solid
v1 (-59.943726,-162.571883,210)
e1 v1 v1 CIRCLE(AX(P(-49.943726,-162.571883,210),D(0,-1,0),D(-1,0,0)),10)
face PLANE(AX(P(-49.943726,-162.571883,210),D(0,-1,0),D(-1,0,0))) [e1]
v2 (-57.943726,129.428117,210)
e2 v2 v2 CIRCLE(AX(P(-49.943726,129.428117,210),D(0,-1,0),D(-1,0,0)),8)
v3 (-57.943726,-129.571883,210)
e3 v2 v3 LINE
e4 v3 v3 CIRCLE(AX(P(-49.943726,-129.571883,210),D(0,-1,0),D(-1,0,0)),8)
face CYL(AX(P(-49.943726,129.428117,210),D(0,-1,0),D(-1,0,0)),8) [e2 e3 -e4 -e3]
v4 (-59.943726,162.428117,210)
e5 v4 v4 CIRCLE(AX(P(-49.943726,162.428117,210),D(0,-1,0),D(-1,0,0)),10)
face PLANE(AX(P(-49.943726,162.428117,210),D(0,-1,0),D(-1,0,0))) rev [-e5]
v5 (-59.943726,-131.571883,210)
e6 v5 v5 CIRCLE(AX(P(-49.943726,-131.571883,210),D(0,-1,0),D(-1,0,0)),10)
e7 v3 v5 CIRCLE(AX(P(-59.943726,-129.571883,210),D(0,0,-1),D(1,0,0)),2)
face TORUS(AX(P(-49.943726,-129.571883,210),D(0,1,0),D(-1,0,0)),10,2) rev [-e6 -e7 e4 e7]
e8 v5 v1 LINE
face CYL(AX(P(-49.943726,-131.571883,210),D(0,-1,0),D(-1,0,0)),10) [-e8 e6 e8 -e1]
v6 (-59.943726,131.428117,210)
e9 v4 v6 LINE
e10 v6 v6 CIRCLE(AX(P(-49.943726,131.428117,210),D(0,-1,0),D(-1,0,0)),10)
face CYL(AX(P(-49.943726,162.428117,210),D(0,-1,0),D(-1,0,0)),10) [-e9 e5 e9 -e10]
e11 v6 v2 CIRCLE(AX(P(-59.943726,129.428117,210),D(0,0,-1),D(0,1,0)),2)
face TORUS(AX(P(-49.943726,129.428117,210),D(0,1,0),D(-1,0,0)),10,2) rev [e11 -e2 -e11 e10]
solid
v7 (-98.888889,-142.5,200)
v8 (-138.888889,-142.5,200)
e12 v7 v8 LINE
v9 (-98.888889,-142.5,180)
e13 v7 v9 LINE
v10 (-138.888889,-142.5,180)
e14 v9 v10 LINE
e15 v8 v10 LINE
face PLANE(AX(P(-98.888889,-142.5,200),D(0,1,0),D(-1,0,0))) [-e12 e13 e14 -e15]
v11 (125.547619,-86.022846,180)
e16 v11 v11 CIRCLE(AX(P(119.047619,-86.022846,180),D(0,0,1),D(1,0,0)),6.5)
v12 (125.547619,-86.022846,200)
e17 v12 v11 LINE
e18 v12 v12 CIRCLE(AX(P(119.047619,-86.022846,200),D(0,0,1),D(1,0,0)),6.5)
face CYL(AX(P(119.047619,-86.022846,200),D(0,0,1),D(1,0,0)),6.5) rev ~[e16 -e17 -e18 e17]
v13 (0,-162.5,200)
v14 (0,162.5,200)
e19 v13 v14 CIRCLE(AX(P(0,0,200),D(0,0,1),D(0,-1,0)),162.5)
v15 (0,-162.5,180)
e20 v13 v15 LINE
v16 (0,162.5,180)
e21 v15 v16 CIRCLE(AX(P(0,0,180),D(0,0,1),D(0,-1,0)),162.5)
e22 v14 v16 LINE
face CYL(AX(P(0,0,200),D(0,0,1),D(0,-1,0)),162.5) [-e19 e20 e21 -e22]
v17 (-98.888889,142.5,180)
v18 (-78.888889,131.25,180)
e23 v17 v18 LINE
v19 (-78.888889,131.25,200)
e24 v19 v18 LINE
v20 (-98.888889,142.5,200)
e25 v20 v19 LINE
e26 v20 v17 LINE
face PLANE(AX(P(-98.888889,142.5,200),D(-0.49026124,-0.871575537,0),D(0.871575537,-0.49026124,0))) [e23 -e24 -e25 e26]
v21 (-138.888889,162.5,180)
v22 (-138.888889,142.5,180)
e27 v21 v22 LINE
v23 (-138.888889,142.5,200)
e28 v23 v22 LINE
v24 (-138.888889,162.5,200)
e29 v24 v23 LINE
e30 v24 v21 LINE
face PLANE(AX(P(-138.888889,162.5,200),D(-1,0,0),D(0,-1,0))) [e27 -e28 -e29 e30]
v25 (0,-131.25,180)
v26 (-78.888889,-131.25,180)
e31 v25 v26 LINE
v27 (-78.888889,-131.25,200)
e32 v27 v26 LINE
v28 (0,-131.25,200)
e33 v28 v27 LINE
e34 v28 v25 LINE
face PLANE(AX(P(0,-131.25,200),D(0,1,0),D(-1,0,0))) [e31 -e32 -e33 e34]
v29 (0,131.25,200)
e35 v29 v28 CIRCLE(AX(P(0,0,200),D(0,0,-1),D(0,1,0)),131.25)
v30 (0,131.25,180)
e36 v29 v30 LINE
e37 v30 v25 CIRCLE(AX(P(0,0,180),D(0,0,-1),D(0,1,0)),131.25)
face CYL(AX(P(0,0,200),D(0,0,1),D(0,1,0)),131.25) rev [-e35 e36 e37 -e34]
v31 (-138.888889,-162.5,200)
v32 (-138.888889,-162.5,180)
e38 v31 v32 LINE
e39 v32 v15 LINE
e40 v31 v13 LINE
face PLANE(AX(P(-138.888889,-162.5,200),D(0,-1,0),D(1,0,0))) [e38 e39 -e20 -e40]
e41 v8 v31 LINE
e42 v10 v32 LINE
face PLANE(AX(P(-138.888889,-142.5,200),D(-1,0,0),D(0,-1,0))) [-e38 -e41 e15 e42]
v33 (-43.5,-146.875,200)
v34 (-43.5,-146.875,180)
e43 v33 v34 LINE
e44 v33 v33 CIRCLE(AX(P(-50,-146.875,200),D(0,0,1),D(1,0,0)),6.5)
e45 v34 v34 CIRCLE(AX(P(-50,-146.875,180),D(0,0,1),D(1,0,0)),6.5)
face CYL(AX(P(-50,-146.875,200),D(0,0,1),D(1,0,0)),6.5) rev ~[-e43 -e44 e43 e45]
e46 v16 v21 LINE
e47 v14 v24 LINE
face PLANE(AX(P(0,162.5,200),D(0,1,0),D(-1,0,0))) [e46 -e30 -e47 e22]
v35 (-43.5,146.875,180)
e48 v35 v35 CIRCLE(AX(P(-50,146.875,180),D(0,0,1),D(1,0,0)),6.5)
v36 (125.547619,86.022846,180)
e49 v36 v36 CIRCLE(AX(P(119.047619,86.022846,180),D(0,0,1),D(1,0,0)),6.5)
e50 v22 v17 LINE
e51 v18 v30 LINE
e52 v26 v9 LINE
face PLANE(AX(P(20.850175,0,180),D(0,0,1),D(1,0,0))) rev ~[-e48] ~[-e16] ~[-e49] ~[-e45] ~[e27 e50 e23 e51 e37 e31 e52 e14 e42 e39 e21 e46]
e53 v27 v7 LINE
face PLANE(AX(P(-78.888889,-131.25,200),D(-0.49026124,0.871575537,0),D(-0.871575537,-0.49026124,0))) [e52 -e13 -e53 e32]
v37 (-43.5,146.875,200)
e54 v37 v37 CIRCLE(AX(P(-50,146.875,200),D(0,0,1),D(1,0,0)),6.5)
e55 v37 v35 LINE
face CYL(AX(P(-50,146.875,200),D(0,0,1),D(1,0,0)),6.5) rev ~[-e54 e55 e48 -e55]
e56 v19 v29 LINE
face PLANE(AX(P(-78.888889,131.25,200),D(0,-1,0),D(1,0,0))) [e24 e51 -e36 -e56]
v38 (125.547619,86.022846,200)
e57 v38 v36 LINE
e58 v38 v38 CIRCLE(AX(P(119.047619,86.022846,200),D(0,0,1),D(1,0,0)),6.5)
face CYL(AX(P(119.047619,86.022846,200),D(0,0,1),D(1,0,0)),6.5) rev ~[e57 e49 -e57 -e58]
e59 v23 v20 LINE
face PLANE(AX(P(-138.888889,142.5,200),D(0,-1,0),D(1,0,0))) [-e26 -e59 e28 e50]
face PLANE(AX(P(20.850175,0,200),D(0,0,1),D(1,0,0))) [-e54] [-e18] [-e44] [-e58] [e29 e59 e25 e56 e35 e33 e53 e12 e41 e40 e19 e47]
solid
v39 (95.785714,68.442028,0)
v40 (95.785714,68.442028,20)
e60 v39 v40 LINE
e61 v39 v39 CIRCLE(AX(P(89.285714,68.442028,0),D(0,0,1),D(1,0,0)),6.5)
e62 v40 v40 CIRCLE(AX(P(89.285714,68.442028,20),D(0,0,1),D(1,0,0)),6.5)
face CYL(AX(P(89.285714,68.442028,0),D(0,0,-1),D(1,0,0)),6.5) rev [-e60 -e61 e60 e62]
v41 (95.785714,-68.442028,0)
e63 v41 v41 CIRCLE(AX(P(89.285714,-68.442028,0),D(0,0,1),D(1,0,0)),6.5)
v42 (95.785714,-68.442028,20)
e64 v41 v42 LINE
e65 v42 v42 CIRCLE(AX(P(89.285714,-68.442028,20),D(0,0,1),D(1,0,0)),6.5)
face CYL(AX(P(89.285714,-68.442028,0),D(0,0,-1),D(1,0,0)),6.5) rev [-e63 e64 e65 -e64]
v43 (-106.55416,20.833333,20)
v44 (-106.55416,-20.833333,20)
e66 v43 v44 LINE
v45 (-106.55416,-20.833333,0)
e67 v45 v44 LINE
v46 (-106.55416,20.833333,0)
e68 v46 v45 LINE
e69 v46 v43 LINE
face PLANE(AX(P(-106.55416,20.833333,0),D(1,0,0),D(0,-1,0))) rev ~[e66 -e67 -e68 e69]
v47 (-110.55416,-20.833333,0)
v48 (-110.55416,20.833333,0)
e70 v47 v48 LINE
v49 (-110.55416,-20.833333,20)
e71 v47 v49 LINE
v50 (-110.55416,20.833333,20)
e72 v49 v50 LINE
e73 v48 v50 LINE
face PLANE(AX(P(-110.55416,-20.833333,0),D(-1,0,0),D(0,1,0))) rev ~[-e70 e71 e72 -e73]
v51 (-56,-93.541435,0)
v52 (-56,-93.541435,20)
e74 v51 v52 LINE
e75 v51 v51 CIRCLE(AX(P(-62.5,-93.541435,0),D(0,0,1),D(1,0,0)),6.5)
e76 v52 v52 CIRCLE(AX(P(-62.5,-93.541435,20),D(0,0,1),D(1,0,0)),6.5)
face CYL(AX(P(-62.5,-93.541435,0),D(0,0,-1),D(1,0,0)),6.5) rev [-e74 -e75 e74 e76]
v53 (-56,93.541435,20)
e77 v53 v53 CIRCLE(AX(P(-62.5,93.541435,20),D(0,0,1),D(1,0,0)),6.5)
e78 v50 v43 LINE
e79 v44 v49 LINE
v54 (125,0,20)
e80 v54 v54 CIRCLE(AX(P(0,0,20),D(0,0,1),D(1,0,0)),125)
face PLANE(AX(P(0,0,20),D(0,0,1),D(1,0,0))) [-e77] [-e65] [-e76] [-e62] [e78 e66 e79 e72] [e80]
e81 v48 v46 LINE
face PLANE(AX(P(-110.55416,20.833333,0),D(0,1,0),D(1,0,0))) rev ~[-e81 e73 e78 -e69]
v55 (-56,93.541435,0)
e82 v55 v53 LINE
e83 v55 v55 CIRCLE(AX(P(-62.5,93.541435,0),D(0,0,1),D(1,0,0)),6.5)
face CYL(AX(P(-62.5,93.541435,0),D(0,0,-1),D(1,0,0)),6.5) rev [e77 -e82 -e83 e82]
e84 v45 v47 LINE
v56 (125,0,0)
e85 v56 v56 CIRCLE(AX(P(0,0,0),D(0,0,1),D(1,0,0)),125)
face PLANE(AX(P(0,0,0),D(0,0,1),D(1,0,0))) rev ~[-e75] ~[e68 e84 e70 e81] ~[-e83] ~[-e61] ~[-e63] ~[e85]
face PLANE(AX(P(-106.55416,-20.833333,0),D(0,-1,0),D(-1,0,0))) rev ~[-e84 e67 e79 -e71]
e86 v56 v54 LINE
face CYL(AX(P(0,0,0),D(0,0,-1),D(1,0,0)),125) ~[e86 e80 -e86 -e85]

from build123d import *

# Parameters (mm, degrees)
F0_R     = 125
F0_R_2   = 6.5
F1_DEPTH = 20
F3_R     = 6.5
F4_DEPTH = 20


with BuildPart() as f1:
    # F0 (on Top) → F1 (new body)
    with BuildSketch(Plane.XY):
        Circle(F0_R)
        with Locations((-62.5, -93.5414346693)):
            Circle(F0_R_2, mode=Mode.SUBTRACT)
        Polygon((-110.5541596785, 20.8333333333), (-106.5541596785, 20.8333333333), (-106.5541596785, 0), (-106.5541596785, -20.8333333333), (-110.5541596785, -20.8333333333), (-110.5541596785, 0), align=None, mode=Mode.SUBTRACT)
        with Locations((89.2857142857, -68.4420282026)):
            Circle(F0_R_2, mode=Mode.SUBTRACT)
        with Locations((-62.5, 93.5414346693)):
            Circle(F0_R_2, mode=Mode.SUBTRACT)
        with Locations((89.2857142857, 68.4420282026)):
            Circle(F0_R_2, mode=Mode.SUBTRACT)
    extrude(amount=F1_DEPTH)


with BuildPart() as f4:
    # F3 (on offset) → F4 (new body)
    with BuildSketch(Plane.XY.offset(200)):
        with BuildLine():
            ThreePointArc((0, 131.25), (131.25, 0), (0, -131.25))
            Line((0, -131.25), (-78.8888888889, -131.25))
            Line((-78.8888888889, -131.25), (-98.8888888889, -142.5))
            Line((-98.8888888889, -142.5), (-138.8888888889, -142.5))
            Line((-138.8888888889, -142.5), (-138.8888888889, -162.5))
            Line((-138.8888888889, -162.5), (0, -162.5))
            ThreePointArc((0, -162.5), (162.5, 0), (0, 162.5))
            Line((0, 162.5), (-138.8888888889, 162.5))
            Line((-138.8888888889, 162.5), (-138.8888888889, 142.5))
            Line((-138.8888888889, 142.5), (-98.8888888889, 142.5))
            Line((-98.8888888889, 142.5), (-78.8888888889, 131.25))
            Line((-78.8888888889, 131.25), (0, 131.25))
        make_face()
        with Locations((-50, -146.875)):
            Circle(F3_R, mode=Mode.SUBTRACT)
        with Locations((119.0476190476, -86.0228459428)):
            Circle(F3_R, mode=Mode.SUBTRACT)
        with Locations((-50, 146.875)):
            Circle(F3_R, mode=Mode.SUBTRACT)
        with Locations((119.0476190476, 86.0228459428)):
            Circle(F3_R, mode=Mode.SUBTRACT)
    extrude(amount=-F4_DEPTH)


with BuildPart() as f7:
    # F6 (on offset) → F7 (revolve)
    with BuildSketch(Plane.XY.offset(210)):
        with BuildLine():
            Line((-59.9437263161, -162.5718830858), (-49.9437263161, -162.5718830858))
            Line((-49.9437263161, -162.5718830858), (-49.9437263161, 162.4281169142))
            Line((-49.9437263161, 162.4281169142), (-59.9437263161, 162.4281169142))
            Line((-59.9437263161, 162.4281169142), (-59.9437263161, 131.4281169142))
            ThreePointArc((-59.9437263161, 131.4281169142), (-58.5295127537, 130.8423304766), (-57.9437263161, 129.4281169142))
            Line((-57.9437263161, 129.4281169142), (-57.9437263161, -129.5718830858))
            ThreePointArc((-57.9437263161, -129.5718830858), (-58.5295127537, -130.9860966482), (-59.9437263161, -131.5718830858))
            Line((-59.9437263161, -131.5718830858), (-59.9437263161, -162.5718830858))
        make_face()
    revolve(axis=Axis((-49.9437263161, -0.0718830858, 210), (0, -1, 0)))


solid = Compound([f1.part, f4.part, f7.part])
